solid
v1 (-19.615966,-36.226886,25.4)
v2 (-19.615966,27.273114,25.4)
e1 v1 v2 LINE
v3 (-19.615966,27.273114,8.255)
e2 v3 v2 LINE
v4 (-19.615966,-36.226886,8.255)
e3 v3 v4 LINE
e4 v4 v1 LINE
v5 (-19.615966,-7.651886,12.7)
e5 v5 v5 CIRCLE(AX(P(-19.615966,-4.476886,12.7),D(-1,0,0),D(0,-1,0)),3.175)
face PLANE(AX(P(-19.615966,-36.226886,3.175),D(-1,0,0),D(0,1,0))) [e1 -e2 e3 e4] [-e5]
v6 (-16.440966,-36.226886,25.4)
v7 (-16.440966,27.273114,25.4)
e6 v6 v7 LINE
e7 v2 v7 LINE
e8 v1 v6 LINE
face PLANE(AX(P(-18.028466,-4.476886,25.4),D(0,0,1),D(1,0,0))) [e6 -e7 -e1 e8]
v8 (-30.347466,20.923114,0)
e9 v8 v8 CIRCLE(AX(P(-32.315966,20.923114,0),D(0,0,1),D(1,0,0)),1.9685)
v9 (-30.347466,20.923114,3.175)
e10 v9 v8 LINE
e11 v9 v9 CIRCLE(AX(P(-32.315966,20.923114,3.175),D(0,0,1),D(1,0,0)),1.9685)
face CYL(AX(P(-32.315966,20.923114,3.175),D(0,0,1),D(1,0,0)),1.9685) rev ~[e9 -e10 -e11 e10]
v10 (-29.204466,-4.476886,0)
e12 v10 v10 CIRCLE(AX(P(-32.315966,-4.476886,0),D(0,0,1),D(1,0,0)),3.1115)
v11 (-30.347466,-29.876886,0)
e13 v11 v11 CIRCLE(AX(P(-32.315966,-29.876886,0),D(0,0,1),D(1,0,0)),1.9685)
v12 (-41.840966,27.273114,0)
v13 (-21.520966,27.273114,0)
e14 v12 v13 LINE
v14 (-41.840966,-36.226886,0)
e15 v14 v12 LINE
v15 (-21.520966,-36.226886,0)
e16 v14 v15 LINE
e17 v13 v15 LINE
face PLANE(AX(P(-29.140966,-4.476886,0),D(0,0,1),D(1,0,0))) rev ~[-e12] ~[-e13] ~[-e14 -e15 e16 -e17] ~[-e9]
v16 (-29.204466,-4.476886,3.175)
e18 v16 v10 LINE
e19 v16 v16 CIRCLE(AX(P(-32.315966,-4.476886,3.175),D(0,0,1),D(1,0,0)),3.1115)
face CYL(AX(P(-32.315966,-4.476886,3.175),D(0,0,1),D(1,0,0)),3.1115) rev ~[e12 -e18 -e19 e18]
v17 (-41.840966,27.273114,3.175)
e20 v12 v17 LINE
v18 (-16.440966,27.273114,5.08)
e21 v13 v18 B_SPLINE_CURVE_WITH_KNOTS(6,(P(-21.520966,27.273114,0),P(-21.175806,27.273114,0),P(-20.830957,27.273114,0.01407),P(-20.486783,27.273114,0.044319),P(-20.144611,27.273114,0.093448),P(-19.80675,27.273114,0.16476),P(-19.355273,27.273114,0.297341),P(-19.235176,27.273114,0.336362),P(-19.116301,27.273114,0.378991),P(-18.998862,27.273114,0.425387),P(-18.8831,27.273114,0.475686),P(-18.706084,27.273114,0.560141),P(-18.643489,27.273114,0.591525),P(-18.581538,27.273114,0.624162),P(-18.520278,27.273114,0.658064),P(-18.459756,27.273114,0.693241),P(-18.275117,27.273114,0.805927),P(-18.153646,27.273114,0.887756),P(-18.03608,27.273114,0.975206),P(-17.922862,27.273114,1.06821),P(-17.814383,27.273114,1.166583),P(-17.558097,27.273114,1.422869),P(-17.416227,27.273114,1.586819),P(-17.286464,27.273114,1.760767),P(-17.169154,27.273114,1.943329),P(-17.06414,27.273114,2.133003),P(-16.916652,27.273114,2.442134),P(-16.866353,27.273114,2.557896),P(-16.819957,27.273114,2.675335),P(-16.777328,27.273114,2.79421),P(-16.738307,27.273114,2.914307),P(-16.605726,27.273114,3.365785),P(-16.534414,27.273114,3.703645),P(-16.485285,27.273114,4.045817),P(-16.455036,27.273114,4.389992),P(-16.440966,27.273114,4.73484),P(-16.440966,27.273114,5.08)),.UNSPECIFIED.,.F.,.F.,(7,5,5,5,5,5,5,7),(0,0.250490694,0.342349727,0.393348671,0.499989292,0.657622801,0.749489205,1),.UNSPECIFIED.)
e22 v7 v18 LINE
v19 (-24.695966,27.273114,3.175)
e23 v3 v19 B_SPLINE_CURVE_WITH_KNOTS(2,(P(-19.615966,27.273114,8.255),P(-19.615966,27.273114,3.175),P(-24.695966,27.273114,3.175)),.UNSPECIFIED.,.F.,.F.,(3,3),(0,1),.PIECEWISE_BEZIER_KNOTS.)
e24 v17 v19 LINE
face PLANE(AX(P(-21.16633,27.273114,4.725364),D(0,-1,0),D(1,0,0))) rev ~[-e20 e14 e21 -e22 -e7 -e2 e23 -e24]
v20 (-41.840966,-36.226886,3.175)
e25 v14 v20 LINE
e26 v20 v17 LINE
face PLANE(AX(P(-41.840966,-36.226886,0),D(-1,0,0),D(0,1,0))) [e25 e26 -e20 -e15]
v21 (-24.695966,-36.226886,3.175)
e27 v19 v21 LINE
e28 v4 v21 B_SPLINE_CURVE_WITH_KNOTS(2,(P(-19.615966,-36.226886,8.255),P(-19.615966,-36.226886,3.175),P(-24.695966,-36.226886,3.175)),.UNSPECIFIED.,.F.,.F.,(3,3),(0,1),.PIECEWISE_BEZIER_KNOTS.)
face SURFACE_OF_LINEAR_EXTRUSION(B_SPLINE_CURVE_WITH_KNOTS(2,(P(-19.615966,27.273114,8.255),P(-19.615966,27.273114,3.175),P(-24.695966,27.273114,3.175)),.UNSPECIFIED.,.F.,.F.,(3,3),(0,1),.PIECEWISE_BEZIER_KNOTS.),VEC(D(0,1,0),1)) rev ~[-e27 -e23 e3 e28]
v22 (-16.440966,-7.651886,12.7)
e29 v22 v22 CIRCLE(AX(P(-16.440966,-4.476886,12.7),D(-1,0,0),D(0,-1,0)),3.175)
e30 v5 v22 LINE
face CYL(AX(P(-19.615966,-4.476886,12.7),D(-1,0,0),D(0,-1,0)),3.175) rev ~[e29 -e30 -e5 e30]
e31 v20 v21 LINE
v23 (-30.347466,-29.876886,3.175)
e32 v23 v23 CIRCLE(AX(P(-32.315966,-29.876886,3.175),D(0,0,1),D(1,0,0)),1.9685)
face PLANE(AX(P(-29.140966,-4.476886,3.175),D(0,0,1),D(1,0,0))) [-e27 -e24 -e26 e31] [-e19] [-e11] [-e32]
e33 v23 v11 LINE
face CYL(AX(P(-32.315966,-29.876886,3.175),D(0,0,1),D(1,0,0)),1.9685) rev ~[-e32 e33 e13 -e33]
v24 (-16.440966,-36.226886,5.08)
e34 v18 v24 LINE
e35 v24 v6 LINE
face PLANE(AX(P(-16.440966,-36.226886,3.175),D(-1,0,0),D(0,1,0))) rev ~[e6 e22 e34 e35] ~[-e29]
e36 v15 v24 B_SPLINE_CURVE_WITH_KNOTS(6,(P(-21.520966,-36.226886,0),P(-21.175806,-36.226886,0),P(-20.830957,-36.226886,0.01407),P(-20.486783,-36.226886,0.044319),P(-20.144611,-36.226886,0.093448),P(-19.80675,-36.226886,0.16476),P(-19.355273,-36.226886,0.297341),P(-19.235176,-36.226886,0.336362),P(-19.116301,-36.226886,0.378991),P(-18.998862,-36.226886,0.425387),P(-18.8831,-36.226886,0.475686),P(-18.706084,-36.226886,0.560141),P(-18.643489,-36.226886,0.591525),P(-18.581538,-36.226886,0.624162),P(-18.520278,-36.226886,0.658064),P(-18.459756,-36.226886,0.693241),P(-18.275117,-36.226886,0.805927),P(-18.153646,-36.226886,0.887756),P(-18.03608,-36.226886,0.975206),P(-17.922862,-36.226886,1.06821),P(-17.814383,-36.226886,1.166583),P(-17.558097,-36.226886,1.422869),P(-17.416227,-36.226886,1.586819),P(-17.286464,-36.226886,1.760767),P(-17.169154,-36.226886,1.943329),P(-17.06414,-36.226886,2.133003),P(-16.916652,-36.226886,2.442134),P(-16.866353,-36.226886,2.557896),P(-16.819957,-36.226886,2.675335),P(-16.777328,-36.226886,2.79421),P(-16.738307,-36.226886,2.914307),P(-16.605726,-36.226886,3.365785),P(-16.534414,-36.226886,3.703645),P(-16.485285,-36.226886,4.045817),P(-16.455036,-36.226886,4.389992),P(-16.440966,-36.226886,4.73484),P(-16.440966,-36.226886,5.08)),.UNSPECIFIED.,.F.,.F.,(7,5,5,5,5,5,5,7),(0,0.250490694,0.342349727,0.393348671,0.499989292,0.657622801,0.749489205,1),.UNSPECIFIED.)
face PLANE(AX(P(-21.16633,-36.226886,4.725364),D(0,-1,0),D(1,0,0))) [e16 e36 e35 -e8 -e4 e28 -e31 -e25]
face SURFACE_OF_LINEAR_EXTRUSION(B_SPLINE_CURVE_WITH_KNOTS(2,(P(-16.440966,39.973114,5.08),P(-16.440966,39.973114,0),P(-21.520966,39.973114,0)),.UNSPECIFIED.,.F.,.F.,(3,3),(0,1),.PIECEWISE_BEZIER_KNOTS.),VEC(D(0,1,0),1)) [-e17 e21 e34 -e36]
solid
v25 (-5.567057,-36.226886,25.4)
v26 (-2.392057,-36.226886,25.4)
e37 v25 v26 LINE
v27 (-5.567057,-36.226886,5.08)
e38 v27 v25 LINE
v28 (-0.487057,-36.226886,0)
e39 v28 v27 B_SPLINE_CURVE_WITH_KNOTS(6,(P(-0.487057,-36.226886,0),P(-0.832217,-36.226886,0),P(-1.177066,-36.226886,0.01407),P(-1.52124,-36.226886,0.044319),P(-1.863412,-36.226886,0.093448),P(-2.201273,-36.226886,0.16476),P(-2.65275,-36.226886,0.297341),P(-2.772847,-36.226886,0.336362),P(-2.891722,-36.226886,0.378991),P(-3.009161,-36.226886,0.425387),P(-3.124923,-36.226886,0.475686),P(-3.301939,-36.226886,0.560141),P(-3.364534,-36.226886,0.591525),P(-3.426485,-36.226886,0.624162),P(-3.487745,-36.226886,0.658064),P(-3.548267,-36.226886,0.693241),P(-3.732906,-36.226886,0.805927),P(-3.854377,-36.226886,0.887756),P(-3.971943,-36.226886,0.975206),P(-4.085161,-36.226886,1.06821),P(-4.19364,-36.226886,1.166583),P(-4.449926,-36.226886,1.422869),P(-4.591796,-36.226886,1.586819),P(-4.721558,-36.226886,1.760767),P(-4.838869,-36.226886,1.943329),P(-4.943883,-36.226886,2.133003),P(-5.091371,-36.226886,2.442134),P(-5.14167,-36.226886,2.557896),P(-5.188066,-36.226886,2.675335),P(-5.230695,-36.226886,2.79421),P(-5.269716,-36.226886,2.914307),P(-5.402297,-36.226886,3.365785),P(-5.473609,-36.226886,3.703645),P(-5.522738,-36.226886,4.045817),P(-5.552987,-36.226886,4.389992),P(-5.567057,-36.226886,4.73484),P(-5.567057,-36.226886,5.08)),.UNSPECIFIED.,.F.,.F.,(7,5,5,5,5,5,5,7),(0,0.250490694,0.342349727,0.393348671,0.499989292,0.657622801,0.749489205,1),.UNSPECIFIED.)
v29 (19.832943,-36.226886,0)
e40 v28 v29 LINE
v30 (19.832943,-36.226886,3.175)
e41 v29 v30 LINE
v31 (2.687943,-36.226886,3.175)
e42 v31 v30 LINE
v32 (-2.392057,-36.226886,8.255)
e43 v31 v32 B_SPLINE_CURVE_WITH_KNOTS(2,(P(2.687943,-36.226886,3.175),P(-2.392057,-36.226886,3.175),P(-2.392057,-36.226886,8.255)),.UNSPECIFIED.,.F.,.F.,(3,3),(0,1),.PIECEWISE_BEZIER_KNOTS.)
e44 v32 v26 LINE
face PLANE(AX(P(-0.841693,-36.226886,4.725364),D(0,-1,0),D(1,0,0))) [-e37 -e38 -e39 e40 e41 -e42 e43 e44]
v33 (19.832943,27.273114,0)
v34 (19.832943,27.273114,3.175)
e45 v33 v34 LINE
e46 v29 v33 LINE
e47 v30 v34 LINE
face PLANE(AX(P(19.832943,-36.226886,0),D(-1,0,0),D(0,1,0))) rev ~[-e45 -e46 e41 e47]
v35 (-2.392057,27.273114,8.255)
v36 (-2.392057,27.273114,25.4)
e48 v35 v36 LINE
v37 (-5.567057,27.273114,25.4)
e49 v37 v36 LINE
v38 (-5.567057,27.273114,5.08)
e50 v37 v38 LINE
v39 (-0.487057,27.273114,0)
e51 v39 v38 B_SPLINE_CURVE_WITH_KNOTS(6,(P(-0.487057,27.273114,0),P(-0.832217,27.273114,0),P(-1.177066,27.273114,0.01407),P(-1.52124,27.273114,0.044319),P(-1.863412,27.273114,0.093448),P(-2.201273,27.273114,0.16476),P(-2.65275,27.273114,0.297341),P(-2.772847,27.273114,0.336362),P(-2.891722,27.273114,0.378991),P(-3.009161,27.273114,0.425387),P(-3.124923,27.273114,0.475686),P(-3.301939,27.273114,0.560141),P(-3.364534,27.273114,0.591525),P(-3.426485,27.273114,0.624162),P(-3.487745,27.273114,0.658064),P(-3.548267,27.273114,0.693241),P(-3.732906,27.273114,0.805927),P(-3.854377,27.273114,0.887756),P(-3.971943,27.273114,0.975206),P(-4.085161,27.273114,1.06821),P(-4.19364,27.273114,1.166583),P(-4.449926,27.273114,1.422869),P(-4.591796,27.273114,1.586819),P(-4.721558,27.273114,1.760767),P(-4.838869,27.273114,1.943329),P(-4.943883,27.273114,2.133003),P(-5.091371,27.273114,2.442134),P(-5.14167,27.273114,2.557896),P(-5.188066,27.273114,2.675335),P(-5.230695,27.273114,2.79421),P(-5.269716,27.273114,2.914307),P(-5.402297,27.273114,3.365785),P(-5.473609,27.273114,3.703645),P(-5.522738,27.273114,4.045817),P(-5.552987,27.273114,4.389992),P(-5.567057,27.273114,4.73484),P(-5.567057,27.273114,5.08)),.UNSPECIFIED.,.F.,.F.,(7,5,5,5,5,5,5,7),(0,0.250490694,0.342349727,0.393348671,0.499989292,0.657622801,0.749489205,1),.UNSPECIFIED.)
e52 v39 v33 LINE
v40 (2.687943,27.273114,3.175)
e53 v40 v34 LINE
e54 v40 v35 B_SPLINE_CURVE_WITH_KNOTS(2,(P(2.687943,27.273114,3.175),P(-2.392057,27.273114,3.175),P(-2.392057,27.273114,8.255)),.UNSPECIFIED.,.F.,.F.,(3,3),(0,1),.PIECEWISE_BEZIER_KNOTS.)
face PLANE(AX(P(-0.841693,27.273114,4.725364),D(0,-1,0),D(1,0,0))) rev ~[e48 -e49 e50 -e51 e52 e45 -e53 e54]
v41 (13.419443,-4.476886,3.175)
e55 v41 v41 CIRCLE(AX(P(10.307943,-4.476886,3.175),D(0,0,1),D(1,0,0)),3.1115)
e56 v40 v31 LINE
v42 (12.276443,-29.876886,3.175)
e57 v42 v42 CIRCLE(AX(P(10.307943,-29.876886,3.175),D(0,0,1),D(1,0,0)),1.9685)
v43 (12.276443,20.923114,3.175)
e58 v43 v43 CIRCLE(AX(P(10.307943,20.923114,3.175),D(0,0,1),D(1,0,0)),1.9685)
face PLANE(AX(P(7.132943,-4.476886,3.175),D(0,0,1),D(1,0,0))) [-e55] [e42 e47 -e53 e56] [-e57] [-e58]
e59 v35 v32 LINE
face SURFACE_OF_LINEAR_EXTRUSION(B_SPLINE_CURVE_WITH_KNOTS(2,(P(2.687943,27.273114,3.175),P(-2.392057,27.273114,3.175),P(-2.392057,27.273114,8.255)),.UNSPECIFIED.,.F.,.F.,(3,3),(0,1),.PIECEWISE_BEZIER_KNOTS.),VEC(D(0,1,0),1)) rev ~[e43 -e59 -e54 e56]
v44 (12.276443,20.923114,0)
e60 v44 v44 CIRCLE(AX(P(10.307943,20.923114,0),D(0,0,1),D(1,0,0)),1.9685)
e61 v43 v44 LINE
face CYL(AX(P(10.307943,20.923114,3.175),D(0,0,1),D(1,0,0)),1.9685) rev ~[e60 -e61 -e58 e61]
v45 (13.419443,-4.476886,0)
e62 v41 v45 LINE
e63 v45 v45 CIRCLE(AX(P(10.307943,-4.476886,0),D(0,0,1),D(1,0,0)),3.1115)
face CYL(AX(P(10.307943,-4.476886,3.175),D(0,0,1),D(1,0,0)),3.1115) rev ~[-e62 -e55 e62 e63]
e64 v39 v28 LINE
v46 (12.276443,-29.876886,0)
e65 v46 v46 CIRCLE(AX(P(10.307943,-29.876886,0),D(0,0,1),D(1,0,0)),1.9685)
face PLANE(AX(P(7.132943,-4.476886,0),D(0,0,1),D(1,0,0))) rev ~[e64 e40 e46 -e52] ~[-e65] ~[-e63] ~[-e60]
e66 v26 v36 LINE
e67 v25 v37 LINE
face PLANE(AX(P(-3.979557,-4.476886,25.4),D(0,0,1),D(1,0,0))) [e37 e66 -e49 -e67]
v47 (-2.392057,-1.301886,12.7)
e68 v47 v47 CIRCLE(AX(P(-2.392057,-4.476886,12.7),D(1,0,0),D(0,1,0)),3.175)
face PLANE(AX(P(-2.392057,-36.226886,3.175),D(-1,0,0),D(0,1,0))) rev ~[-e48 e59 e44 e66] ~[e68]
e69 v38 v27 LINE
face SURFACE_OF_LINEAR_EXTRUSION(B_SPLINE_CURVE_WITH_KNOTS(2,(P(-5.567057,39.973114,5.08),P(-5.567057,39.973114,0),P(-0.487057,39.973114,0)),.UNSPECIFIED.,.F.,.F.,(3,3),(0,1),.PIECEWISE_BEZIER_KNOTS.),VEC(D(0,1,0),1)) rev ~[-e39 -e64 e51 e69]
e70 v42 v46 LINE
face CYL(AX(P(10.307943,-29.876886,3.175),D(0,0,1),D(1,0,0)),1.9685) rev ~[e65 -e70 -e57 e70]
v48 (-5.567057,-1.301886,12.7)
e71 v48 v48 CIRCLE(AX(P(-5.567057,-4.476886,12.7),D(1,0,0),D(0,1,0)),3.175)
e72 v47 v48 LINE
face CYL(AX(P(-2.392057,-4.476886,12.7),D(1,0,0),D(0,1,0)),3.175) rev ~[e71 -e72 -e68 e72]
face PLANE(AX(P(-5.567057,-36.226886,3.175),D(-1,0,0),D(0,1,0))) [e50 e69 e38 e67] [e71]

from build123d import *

# Parameters (mm, degrees)
F0_W           = 25.4
F0_H           = 63.5
F1_DEPTH       = 3.175
F2_W           = 3.175
F2_H           = 63.5
F3_DEPTH       = 22.225
F4_R           = 3.175
F5_DEPTH       = 3.175
F6_R           = 1.9685
F7_DEPTH       = 3.175
F8_R           = 1.9685
F9_DEPTH       = 3.175
F10_R          = 3.1115
F11_DEPTH      = 3.175
F12_W          = 25.4
F12_H          = 63.5
F13_DEPTH      = 3.175
F14_R          = 3.1115
F15_R          = 1.9685
F16_DEPTH      = 3.175
F17_W          = 3.175
F17_H          = 63.5
F18_DEPTH      = 22.225
F19_R          = 3.175
F20_DEPTH      = 3.175
F21_T1_DEPTH   = 63.5
F21_T3_DEPTH   = 88.9
F21_2_T1_DEPTH = 63.5
F21_2_T3_DEPTH = 88.9


# Not quite as in the source:
# - a fillet or chamfer that OpenCascade refuses, or shapes differently, is made with other operations: its cross-section is extruded or revolved along the edge and cut away or added


with BuildPart() as f1:
    # F0 (on Top) → F1 (new body)
    with BuildSketch(Plane.XY):
        with Locations((-29.1409659298, -4.4768862426)):
            Rectangle(F0_W, F0_H)
    extrude(amount=F1_DEPTH)

    # F2 (on face) → F3 (join)
    with BuildSketch(Plane.XY.offset(3.175)):
        with Locations((-18.0284659298, -4.4768862426)):
            Rectangle(F2_W, F2_H)
    extrude(amount=F3_DEPTH)

    # F4 (on face) → F5 (cut)
    with BuildSketch(Plane(origin=(-19.6159659298, 0, 0), x_dir=(0, -1, 0), z_dir=(-1, 0, 0))):
        with Locations((4.4768862426, 12.7)):
            Circle(F4_R)
    extrude(amount=-F5_DEPTH, mode=Mode.SUBTRACT)

    # F6 (on face) → F7 (cut)
    with BuildSketch(Plane.XY.offset(3.175)):
        with Locations((-32.3159659298, 20.9231137574)):
            Circle(F6_R)
    extrude(amount=-F7_DEPTH, mode=Mode.SUBTRACT)

    # F8 (on face) → F9 (cut)
    with BuildSketch(Plane.XY.offset(3.175)):
        with Locations((-32.3159659298, -29.8768862426)):
            Circle(F8_R)
    extrude(amount=-F9_DEPTH, mode=Mode.SUBTRACT)

    # F10 (on face) → F11 (cut)
    with BuildSketch(Plane.XY.offset(3.175)):
        with Locations((-32.3159659298, -4.4768862426)):
            Circle(F10_R)
    extrude(amount=-F11_DEPTH, mode=Mode.SUBTRACT)

    # F21: fillet of radius 5.08 on 2 edges, made by hand

    # F21_s2 → F21_t1 (join)
    with BuildSketch(Plane.XZ.offset(-27.2731137574)):
        with BuildLine():
            add(Edge.make_bspline(
                [(-19.6159659298, 8.255), (-19.6159659298, 3.175), (-24.6959659298, 3.175)],
                knots=[0, 0, 0, 1, 1, 1], degree=2, weights=[1, 1, 1]))
            Line((-24.6959659298, 3.175), (-19.6159659298, 3.175))
            Line((-19.6159659298, 3.175), (-19.6159659298, 8.255))
        make_face()
    extrude(amount=F21_T1_DEPTH)

    # F21_s4 → F21_t3 (cut)
    with BuildSketch(Plane.XZ.offset(-39.9731137574)):
        with BuildLine():
            add(Edge.make_bspline(
                [(-16.4409659298, 5.08), (-16.4409659298, 0), (-21.5209659298, 0)],
                knots=[0, 0, 0, 1, 1, 1], degree=2, weights=[1, 1, 1]))
            Line((-21.5209659298, 0), (-16.4409659298, 0))
            Line((-16.4409659298, 0), (-16.4409659298, 5.08))
        make_face()
    extrude(amount=F21_T3_DEPTH, mode=Mode.SUBTRACT)


with BuildPart() as f13:
    # F12 (on Top) → F13 (new body)
    with BuildSketch(Plane.XY):
        with Locations((7.1329429418, -4.4768862426)):
            Rectangle(F12_W, F12_H)
    extrude(amount=F13_DEPTH)

    # F14 (on face) + F15 (on face) → F16 (cut)
    with BuildSketch(Plane.XY.offset(3.175)):
        with Locations((10.3079429418, -4.4768862426)):
            Circle(F14_R)
    with BuildSketch(Plane.XY.offset(3.175)):
        with Locations((10.3079429418, 20.9231137574)):
            Circle(F15_R)
        with Locations((10.3079429418, -29.8768862426)):
            Circle(F15_R)
    extrude(amount=-F16_DEPTH, mode=Mode.SUBTRACT)

    # F17 (on face) → F18 (join)
    with BuildSketch(Plane.XY.offset(3.175)):
        with Locations((-3.9795570582, -4.4768862426)):
            Rectangle(F17_W, F17_H)
    extrude(amount=F18_DEPTH)

    # F19 (on face) → F20 (cut)
    with BuildSketch(Plane.YZ.offset(-2.3920570582)):
        with Locations((-4.4768862426, 12.7)):
            Circle(F19_R)
    extrude(amount=-F20_DEPTH, mode=Mode.SUBTRACT)

    # F21#2: fillet of radius 5.08 on 2 edges, made by hand

    # F21_2_s2 → F21_2_t1 (join)
    with BuildSketch(Plane.XZ.offset(-27.2731137574)):
        with BuildLine():
            add(Edge.make_bspline(
                [(2.6879429418, 3.175), (-2.3920570582, 3.175), (-2.3920570582, 8.255)],
                knots=[0, 0, 0, 1, 1, 1], degree=2, weights=[1, 1, 1]))
            Line((-2.3920570582, 8.255), (-2.3920570582, 3.175))
            Line((-2.3920570582, 3.175), (2.6879429418, 3.175))
        make_face()
    extrude(amount=F21_2_T1_DEPTH)

    # F21_2_s4 → F21_2_t3 (cut)
    with BuildSketch(Plane.XZ.offset(-39.9731137574)):
        with BuildLine():
            add(Edge.make_bspline(
                [(-5.5670570582, 5.08), (-5.5670570582, 0), (-0.4870570582, 0)],
                knots=[0, 0, 0, 1, 1, 1], degree=2, weights=[1, 1, 1]))
            Line((-0.4870570582, 0), (-5.5670570582, 0))
            Line((-5.5670570582, 0), (-5.5670570582, 5.08))
        make_face()
    extrude(amount=F21_2_T3_DEPTH, mode=Mode.SUBTRACT)


solid = Compound([f1.part, f13.part])
